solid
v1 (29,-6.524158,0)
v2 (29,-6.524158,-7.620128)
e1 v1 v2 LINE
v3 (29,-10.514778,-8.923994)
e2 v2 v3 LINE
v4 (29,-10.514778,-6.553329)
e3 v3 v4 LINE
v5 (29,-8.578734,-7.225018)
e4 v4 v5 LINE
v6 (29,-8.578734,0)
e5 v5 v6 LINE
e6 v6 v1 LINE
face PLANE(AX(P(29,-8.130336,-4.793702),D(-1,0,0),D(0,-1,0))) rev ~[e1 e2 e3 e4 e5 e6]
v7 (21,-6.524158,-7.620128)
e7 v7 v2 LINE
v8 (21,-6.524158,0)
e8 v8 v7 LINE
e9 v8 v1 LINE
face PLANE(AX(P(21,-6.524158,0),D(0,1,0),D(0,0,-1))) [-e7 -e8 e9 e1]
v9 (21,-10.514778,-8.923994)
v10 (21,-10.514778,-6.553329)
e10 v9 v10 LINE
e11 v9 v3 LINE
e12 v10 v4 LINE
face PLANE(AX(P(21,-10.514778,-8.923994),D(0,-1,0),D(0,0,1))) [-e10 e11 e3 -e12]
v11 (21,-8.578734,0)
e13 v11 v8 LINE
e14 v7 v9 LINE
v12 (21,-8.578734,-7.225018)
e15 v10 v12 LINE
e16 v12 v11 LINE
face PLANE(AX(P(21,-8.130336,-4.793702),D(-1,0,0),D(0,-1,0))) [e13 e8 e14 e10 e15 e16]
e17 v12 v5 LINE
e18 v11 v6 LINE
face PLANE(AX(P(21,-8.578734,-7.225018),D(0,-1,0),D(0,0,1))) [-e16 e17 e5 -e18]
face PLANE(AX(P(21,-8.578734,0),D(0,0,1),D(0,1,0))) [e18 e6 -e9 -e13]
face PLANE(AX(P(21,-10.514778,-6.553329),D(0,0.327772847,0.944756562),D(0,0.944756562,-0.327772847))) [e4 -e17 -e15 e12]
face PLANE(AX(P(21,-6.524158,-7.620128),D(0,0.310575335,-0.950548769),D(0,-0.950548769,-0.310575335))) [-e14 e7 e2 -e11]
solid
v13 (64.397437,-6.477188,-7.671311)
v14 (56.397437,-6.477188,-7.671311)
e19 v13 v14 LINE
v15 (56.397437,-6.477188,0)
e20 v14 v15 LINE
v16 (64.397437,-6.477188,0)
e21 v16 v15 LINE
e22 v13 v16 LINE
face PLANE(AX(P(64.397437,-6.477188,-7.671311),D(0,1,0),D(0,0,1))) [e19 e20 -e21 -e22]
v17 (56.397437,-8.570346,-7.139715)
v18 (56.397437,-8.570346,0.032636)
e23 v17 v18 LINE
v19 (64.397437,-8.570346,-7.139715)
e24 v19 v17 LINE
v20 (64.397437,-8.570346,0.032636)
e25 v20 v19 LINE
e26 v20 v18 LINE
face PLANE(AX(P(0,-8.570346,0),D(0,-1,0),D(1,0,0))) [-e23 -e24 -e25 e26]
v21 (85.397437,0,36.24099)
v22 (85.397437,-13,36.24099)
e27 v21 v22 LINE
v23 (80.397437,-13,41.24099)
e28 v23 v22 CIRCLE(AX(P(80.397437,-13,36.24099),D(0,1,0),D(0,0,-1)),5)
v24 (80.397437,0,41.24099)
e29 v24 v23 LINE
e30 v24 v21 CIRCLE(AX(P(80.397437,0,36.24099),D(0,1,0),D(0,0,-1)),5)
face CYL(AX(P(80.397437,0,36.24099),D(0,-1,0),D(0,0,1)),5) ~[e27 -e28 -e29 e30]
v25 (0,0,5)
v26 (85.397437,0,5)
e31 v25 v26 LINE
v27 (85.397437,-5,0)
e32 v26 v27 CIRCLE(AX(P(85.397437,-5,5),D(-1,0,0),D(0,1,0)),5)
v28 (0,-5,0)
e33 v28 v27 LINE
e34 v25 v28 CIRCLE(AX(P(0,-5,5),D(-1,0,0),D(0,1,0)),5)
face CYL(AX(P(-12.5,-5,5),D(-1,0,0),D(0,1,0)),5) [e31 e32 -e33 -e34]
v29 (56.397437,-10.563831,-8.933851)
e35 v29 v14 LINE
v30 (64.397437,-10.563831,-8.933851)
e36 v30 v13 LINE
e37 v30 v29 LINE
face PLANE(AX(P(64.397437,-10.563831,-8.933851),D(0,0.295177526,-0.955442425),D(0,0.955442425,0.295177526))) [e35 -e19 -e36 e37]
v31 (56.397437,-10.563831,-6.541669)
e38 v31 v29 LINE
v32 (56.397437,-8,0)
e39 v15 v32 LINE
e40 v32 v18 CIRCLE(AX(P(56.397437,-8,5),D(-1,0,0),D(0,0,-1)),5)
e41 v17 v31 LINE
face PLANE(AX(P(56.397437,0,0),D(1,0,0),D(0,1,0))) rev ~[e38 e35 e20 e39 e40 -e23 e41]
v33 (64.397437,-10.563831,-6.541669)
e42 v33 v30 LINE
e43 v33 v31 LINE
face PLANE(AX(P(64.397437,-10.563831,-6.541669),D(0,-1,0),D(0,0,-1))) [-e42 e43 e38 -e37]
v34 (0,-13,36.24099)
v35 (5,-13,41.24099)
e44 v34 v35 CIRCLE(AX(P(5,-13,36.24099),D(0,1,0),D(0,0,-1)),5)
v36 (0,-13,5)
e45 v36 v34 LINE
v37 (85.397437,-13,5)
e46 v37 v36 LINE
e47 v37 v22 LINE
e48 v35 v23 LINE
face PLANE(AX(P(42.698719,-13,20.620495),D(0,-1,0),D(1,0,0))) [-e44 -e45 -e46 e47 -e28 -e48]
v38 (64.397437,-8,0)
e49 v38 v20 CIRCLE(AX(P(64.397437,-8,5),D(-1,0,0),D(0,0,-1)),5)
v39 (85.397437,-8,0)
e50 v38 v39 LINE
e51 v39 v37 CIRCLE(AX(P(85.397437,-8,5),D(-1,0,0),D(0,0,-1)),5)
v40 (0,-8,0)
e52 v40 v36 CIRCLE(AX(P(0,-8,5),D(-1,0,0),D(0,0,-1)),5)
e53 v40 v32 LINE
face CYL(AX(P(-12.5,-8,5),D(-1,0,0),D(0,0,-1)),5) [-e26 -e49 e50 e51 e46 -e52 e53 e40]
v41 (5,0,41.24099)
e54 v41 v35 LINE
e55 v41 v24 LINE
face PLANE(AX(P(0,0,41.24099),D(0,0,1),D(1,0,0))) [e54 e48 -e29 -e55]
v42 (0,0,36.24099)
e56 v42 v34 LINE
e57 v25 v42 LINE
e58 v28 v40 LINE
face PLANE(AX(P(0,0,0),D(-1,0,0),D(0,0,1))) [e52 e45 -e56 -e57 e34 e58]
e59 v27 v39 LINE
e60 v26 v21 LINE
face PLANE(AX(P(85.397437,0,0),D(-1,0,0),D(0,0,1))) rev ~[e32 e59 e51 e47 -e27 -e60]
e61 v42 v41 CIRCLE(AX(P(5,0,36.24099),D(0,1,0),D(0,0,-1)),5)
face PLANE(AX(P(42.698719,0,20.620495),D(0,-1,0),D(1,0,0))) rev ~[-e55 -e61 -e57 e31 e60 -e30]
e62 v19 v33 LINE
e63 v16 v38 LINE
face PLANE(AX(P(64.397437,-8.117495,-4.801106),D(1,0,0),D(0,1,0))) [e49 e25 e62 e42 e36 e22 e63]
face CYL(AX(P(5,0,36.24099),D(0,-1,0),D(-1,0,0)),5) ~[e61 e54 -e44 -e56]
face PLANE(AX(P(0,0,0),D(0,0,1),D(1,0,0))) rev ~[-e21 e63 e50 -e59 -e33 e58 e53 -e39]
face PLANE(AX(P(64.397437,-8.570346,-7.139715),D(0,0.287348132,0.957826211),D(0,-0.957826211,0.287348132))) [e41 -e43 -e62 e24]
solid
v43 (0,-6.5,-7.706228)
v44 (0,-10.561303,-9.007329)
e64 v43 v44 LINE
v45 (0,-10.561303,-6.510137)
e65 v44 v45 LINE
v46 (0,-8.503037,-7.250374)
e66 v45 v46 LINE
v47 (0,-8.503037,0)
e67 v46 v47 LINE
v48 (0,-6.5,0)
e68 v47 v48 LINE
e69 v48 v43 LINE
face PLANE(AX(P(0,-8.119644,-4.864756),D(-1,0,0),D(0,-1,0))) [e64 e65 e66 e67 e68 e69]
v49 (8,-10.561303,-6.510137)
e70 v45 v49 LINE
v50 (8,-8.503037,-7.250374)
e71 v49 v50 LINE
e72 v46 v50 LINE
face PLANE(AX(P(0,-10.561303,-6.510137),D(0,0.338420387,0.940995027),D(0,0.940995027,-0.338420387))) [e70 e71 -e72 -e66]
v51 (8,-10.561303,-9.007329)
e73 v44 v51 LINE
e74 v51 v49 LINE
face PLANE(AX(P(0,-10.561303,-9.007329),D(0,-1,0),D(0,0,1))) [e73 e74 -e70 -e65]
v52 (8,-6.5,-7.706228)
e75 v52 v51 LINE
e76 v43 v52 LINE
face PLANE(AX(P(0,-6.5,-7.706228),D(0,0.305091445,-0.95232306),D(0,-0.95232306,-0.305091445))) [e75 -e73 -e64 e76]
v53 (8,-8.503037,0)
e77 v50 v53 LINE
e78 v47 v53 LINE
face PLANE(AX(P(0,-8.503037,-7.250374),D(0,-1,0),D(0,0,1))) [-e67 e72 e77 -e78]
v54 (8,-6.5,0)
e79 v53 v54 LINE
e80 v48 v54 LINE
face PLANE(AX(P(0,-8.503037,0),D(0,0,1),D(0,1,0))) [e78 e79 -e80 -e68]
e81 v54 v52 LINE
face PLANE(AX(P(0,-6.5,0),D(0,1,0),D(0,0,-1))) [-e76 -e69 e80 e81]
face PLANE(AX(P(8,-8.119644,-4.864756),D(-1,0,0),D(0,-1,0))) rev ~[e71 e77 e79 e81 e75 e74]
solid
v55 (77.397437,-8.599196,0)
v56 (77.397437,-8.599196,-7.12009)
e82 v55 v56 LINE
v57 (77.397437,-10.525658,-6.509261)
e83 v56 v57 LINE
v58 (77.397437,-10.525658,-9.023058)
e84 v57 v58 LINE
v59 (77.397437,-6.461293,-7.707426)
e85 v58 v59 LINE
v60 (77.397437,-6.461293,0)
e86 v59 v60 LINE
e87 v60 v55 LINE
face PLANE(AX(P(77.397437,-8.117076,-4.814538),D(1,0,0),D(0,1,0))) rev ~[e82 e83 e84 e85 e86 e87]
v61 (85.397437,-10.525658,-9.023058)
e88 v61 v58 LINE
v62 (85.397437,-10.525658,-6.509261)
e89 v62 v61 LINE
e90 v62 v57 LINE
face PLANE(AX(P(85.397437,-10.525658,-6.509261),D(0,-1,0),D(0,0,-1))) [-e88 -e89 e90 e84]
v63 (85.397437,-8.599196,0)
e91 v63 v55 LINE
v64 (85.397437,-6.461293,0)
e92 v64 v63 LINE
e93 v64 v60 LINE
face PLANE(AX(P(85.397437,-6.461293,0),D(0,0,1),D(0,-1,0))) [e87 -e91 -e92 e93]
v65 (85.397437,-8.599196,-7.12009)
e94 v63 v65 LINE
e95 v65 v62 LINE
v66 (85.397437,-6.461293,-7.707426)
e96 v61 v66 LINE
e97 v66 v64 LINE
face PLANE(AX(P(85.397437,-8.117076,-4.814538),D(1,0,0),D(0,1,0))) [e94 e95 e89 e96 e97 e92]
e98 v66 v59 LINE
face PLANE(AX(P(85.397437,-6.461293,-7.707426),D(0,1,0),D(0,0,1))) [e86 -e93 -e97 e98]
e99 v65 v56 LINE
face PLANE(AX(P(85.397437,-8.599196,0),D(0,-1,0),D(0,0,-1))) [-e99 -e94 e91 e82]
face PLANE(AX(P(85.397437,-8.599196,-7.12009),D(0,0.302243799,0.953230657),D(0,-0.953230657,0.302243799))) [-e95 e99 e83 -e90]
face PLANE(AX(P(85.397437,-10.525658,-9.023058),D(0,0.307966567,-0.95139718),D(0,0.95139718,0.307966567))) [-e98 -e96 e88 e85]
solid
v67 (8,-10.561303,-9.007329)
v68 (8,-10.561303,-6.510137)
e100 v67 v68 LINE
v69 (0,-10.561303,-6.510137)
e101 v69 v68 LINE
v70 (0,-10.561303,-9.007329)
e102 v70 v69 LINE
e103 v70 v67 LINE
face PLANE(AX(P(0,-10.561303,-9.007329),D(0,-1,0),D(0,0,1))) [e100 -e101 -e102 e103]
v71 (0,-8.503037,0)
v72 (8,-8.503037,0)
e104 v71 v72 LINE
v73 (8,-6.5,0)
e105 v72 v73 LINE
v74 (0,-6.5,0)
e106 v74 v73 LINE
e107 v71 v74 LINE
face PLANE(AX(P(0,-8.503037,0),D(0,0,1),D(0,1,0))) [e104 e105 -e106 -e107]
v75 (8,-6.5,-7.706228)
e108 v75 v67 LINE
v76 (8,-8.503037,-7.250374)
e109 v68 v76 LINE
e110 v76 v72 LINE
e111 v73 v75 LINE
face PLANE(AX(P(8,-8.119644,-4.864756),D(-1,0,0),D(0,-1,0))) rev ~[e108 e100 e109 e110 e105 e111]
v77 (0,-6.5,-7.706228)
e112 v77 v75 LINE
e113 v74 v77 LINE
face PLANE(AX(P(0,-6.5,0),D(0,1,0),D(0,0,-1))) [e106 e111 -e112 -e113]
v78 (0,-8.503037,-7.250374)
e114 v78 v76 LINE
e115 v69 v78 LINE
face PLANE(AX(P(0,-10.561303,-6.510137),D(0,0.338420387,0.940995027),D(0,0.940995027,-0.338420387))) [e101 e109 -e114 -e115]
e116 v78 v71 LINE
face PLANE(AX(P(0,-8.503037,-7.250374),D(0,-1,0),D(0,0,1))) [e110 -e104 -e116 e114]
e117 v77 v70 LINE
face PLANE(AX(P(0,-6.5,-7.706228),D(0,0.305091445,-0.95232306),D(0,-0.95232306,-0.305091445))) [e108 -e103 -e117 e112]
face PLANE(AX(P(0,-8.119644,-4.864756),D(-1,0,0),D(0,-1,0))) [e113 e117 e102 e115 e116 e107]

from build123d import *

# Parameters (mm, degrees)
F0_W          = 85.3974372149
F0_H          = 41.2409901619
F1_DEPTH      = 13
F3_DEPTH      = 8
F6_DEPTH      = 8
F9_DEPTH      = 8
F11_DEPTH     = 8
F12_R         = 5
F13_T1_DEPTH  = 110.3974372149
F13_T6_DEPTH  = 110.3974372149
F13_T12_DEPTH = 110.3974372149
F13_T18_DEPTH = 110.3974372149
F13_T25_DEPTH = 110.3974372149
F13_T31_DEPTH = 110.3974372149


# Not quite as in the source:
# - a fillet or chamfer that OpenCascade refuses, or shapes differently, is made with other operations: its cross-section is extruded or revolved along the edge and cut away or added


with BuildPart() as f1:
    # F0 (on Front) → F1 (new body)
    with BuildSketch(Plane.XZ):
        with Locations((42.6987186074, 20.6204950809)):
            Rectangle(F0_W, F0_H)
    extrude(amount=F1_DEPTH)

    # F8 (on offset) → F9 (join)
    with BuildSketch(Plane.YZ.offset(64.3974372149)):
        Polygon((-6.4771878533, 0), (-8.57034605, 0), (-8.57034605, -7.1397153661), (-10.5638308451, -6.5416693687), (-10.5638308451, -8.9338514954), (-6.4771878533, -7.6713105664), align=None)
    extrude(amount=-F9_DEPTH)

    # F12
    f12_edges = [f1.edges().sort_by_distance(p)[0] for p in [
        (0, -6.5, 41.24099),
        (85.397437, -6.5, 41.24099),
    ]]
    fillet(f12_edges, radius=F12_R)

    # F13: fillet of radius 5 on 2 edges, made by hand

    # F13_s2 → F13_t1 (cut)
    with BuildSketch(Plane.YZ.offset(-12.5)):
        with BuildLine():
            ThreePointArc((0, 5), (-1.4644660941, 1.4644660941), (-5, 0))
            Line((-5, 0), (0, 0))
            Line((0, 0), (0, 5))
        make_face()
    extrude(amount=F13_T1_DEPTH, mode=Mode.SUBTRACT)


with BuildPart() as f3:
    # F2 (on face) → F3 (new body)
    with BuildSketch(Plane(origin=(0, 0, 0), x_dir=(0, -1, 0), z_dir=(-1, 0, 0))):
        Polygon((8.5030365735, 0), (6.5, 0), (6.5, -7.7062277123), (10.5613032356, -9.0073291212), (10.5613032356, -6.5101371147), (8.5030365735, -7.2503741831), (8.5030365735, -6.5101371147), align=None)
    extrude(amount=-F3_DEPTH)


with BuildPart() as f6:
    # F5 (on offset) + F3_face (on face) → F6 (new body)
    with BuildSketch(Plane(origin=(21, 0, 0), x_dir=(0, -1, 0), z_dir=(-1, 0, 0))):
        Polygon((8.5787344724, 0), (6.5241577104, 0), (6.5241577104, -7.6201283373), (10.5147780851, -8.9239943773), (10.5147780851, -6.5533285961), (8.5787344724, -7.225017529), align=None)
    with BuildSketch(Plane(origin=(0, -7.9171831416, -4.7191054137), x_dir=(0, -1, 0), z_dir=(-1, 0, 0))):
        Polygon((0.585853432, 4.7191054137), (-1.4171831416, 4.7191054137), (-1.4171831416, -2.9871222987), (2.644120094, -4.2882237076), (2.644120094, -1.791031701), (0.585853432, -2.5312687694), align=None)
    extrude(amount=-F6_DEPTH)


with BuildPart() as f11:
    # F10 (on face) → F11 (new body)
    with BuildSketch(Plane.YZ.offset(85.3974372149)):
        Polygon((-6.4612929709, 0), (-8.5991956294, 0), (-8.5991956294, -7.1200900711), (-10.5256577954, -6.5092607401), (-10.5256577954, -9.0230582282), (-6.4612929709, -7.7074263245), align=None)
    extrude(amount=-F11_DEPTH)


with BuildPart() as f13_tool4:
    # F13_s5 → F13_t6 (new body)
    with BuildSketch(Plane.YZ.offset(-12.5)):
        with BuildLine():
            ThreePointArc((-8, 0), (-11.5355339059, 1.4644660941), (-13, 5))
            Line((-13, 5), (-13, 0))
            Line((-13, 0), (-8, 0))
        make_face()
    extrude(amount=F13_T6_DEPTH)

    split(bisect_by=Plane.YZ.offset(56.3974372149), keep=Keep.BOTTOM)

    split(bisect_by=Plane.XZ.offset(8.57034605), keep=Keep.BOTTOM)


with BuildPart() as f1_1:
    add(f1.part)

    # F13_t3: cut F13_tool4
    add(f13_tool4.part, mode=Mode.SUBTRACT)


with BuildPart() as f13_tool10:
    # F13_s11 → F13_t12 (new body)
    with BuildSketch(Plane.YZ.offset(-12.5)):
        with BuildLine():
            ThreePointArc((-8, 0), (-11.5355339059, 1.4644660941), (-13, 5))
            Line((-13, 5), (-13, 0))
            Line((-13, 0), (-8, 0))
        make_face()
    extrude(amount=F13_T12_DEPTH)

    split(bisect_by=Plane.YZ.offset(56.3974372149), keep=Keep.BOTTOM)

    split(bisect_by=Plane.XZ.offset(8.57034605), keep=Keep.TOP)


with BuildPart() as f1_2:
    add(f1_1.part)

    # F13_t9: cut F13_tool10
    add(f13_tool10.part, mode=Mode.SUBTRACT)


with BuildPart() as f13_tool16:
    # F13_s17 → F13_t18 (new body)
    with BuildSketch(Plane.YZ.offset(-12.5)):
        with BuildLine():
            ThreePointArc((-8, 0), (-11.5355339059, 1.4644660941), (-13, 5))
            Line((-13, 5), (-13, 0))
            Line((-13, 0), (-8, 0))
        make_face()
    extrude(amount=F13_T18_DEPTH)

    split(bisect_by=Plane.YZ.offset(56.3974372149), keep=Keep.TOP)

    split(bisect_by=Plane.XZ.offset(8.57034605), keep=Keep.TOP)

    split(bisect_by=Plane.YZ.offset(64.3974372149), keep=Keep.BOTTOM)


with BuildPart() as f1_3:
    add(f1_2.part)

    # F13_t15: cut F13_tool16
    add(f13_tool16.part, mode=Mode.SUBTRACT)


with BuildPart() as f13_tool23:
    # F13_s24 → F13_t25 (new body)
    with BuildSketch(Plane.YZ.offset(-12.5)):
        with BuildLine():
            ThreePointArc((-8, 0), (-11.5355339059, 1.4644660941), (-13, 5))
            Line((-13, 5), (-13, 0))
            Line((-13, 0), (-8, 0))
        make_face()
    extrude(amount=F13_T25_DEPTH)

    split(bisect_by=Plane.XZ.offset(8.57034605), keep=Keep.BOTTOM)

    split(bisect_by=Plane.YZ.offset(64.3974372149), keep=Keep.TOP)


with BuildPart() as f1_4:
    add(f1_3.part)

    # F13_t22: cut F13_tool23
    add(f13_tool23.part, mode=Mode.SUBTRACT)


with BuildPart() as f13_tool29:
    # F13_s30 → F13_t31 (new body)
    with BuildSketch(Plane.YZ.offset(-12.5)):
        with BuildLine():
            ThreePointArc((-8, 0), (-11.5355339059, 1.4644660941), (-13, 5))
            Line((-13, 5), (-13, 0))
            Line((-13, 0), (-8, 0))
        make_face()
    extrude(amount=F13_T31_DEPTH)

    split(bisect_by=Plane.XZ.offset(8.57034605), keep=Keep.TOP)

    split(bisect_by=Plane.YZ.offset(64.3974372149), keep=Keep.TOP)


with BuildPart() as f1_5:
    add(f1_4.part)

    # F13_t28: cut F13_tool29
    add(f13_tool29.part, mode=Mode.SUBTRACT)


solid = Compound([f3.part, f6.part, f11.part, f1_5.part])
